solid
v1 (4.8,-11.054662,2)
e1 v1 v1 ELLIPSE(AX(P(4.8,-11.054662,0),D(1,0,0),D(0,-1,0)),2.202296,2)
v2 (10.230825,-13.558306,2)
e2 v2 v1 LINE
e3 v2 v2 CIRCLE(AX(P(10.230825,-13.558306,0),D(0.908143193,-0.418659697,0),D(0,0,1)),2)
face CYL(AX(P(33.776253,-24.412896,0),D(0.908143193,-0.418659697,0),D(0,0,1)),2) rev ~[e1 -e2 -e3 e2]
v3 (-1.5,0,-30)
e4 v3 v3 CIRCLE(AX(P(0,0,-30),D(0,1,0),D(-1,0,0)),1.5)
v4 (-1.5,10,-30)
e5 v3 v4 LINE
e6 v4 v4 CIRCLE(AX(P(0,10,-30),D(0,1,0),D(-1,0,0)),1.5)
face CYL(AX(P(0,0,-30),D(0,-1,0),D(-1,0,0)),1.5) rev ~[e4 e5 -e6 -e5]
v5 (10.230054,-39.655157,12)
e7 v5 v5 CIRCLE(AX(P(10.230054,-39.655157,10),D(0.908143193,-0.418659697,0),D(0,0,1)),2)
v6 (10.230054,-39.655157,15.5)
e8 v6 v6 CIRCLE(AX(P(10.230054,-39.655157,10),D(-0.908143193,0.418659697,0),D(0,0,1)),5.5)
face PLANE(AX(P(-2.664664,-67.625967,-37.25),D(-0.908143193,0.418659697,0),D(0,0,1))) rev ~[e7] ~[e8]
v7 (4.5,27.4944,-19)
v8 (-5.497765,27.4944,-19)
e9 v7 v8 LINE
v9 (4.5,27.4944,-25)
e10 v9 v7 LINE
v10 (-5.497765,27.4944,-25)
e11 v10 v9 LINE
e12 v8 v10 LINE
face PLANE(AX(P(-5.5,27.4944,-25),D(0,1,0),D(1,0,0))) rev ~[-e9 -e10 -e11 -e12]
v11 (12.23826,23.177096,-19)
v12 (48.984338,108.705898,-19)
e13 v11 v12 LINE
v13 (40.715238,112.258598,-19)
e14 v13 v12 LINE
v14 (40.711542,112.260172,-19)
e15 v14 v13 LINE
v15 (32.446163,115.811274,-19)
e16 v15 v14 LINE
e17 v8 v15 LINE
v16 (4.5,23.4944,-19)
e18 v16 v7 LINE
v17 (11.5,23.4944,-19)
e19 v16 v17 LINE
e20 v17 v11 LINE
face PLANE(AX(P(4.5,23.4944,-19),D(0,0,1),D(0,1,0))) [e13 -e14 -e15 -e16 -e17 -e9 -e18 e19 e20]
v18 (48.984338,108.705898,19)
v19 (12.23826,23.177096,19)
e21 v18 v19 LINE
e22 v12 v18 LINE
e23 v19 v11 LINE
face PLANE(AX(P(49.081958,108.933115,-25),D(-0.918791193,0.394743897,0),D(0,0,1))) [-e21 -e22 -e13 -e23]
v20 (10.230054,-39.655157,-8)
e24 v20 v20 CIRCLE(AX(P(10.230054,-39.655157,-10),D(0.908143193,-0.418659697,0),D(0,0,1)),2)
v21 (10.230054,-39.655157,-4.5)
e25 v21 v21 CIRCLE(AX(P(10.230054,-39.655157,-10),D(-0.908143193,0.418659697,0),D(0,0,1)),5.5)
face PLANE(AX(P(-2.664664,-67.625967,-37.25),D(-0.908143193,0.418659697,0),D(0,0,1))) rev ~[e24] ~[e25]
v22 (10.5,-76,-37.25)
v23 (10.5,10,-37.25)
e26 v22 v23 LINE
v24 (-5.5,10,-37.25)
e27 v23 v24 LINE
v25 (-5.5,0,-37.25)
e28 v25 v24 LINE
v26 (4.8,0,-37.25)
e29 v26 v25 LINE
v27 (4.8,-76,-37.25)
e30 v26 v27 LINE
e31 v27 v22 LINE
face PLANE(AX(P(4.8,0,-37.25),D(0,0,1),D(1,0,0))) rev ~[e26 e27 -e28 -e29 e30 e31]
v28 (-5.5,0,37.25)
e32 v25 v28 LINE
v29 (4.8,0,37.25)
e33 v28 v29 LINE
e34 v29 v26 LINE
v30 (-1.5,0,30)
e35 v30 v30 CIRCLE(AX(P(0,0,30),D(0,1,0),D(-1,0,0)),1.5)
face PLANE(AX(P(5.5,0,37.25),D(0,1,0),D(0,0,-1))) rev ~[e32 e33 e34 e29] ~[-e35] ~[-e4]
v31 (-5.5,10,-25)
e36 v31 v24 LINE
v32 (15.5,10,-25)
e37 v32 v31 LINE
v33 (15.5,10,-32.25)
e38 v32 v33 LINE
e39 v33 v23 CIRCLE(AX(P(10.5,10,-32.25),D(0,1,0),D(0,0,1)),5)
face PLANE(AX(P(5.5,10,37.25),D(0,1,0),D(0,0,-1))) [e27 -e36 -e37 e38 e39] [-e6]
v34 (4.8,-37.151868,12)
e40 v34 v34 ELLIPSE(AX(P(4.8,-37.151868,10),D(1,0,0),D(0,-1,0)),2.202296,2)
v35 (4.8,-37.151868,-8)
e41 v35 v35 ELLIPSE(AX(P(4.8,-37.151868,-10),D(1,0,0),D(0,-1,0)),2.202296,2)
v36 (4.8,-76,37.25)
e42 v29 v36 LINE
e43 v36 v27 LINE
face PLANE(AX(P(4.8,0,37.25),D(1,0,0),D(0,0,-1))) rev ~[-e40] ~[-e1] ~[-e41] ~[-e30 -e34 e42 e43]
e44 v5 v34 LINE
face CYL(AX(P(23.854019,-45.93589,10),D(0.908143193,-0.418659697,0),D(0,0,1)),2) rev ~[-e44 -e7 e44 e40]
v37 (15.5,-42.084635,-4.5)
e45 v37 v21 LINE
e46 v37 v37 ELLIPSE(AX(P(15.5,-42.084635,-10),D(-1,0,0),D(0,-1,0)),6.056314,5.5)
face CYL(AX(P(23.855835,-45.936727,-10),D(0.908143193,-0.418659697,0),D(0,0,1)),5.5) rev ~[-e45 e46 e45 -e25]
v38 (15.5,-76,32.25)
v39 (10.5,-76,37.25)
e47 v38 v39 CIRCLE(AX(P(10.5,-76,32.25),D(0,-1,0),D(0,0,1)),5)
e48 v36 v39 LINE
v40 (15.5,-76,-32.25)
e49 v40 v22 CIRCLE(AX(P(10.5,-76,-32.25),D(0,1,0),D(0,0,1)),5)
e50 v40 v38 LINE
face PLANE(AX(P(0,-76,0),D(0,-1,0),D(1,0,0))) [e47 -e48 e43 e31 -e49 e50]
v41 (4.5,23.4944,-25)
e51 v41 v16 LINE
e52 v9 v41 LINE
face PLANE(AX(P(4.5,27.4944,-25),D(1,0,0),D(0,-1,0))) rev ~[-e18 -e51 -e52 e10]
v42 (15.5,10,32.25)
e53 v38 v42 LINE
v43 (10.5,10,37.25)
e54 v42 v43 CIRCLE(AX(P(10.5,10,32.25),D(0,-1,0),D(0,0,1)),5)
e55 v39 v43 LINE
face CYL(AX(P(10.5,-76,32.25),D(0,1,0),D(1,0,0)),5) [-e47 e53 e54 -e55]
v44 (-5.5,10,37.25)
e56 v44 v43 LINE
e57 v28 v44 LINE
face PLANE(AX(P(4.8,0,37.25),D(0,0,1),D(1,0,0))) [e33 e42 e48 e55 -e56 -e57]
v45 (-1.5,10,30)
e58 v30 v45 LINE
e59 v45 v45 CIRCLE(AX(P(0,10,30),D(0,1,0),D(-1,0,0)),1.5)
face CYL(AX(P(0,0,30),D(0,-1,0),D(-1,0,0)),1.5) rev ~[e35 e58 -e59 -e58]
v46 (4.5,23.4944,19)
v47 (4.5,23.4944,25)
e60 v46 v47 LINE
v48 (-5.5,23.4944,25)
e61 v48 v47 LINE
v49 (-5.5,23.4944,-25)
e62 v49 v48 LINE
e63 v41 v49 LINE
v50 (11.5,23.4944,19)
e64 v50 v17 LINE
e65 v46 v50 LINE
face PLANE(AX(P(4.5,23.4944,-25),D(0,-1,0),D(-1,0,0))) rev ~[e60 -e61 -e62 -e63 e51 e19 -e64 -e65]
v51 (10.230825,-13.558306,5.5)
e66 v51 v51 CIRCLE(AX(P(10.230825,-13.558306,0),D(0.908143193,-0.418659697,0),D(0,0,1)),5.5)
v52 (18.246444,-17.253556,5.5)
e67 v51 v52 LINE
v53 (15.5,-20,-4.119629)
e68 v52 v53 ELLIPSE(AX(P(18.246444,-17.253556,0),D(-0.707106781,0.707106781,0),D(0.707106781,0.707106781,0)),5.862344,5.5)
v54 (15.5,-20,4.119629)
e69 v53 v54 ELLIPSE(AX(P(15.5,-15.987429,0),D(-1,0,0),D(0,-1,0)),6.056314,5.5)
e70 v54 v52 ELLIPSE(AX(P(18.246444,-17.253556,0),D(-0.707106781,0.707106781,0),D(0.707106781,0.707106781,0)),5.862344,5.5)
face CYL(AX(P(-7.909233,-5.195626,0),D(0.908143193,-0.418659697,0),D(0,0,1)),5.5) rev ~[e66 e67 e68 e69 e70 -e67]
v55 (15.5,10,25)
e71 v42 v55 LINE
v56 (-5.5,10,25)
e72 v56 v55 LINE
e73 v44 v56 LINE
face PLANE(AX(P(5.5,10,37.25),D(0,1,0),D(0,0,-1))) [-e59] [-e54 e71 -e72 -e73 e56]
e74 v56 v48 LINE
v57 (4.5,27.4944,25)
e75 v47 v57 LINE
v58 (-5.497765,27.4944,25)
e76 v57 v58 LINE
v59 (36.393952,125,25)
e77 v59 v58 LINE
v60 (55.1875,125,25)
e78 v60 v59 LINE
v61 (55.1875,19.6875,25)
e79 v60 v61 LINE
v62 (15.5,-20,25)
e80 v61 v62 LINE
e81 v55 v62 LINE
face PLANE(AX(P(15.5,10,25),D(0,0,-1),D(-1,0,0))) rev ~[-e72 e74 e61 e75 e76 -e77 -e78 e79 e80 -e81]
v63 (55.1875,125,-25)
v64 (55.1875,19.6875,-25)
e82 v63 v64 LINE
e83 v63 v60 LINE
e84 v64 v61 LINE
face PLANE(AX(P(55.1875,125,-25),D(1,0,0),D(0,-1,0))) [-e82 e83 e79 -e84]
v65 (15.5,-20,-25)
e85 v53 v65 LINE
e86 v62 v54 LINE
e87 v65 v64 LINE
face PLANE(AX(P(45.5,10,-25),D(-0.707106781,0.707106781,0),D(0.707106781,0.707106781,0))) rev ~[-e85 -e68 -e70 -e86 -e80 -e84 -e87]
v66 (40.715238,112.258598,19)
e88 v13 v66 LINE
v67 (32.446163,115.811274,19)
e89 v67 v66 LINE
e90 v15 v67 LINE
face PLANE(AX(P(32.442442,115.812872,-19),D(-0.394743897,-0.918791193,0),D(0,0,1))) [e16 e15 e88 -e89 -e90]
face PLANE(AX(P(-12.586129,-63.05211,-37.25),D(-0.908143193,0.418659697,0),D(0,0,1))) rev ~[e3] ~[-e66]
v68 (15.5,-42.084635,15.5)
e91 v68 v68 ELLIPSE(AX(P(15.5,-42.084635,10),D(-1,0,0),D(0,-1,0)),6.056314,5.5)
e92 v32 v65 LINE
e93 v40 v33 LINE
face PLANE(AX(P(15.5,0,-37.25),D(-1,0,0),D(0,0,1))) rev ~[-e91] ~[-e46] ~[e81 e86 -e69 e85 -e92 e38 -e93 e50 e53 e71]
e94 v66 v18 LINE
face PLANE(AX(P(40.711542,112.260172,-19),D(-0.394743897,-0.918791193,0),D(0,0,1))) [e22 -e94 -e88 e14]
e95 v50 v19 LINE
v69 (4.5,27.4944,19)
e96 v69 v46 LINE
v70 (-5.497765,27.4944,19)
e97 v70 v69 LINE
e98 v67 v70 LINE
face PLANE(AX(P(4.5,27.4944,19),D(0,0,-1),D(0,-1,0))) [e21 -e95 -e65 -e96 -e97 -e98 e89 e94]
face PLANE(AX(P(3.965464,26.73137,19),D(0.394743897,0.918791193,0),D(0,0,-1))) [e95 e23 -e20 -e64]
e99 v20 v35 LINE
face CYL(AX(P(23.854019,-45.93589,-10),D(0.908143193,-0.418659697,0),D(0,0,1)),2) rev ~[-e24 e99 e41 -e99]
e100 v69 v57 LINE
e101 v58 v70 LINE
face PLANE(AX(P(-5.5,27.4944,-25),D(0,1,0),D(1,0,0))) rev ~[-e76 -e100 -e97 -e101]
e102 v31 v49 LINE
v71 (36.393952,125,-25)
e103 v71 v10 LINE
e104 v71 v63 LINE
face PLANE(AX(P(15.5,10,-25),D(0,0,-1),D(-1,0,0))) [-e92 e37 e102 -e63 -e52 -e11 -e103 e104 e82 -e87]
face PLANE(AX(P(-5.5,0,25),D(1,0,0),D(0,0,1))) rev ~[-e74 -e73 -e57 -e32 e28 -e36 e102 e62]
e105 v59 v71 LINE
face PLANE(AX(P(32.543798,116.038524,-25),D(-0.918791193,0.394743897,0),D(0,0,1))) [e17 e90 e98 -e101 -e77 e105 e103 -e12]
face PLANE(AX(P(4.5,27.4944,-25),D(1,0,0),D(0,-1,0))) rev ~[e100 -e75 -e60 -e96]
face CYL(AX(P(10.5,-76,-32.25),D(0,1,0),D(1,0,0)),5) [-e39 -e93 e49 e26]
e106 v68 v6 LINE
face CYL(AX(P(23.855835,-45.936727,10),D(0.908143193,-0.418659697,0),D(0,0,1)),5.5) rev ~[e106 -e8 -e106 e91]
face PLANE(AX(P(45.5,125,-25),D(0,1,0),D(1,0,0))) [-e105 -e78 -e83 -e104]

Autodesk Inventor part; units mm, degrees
sketch "Sketch1" plane through (0, 0, 0) normal (0, 1, 0) x (-1, 0, 0)
  line L0 (5.5, 37.25) -> (-5.5, 37.25)
  line L1 (-5.5, 37.25) -> (-5.5, -37.25)
  line L2 (-5.5, -37.25) -> (5.5, -37.25)
  line L3 (5.5, -37.25) -> (5.5, 37.25)
  line L4 (5.5, 37.25) -> (-5.5, -37.25) construction
  line L5 (-5.5, 37.25) -> (5.5, -37.25) construction
  circle A0 centre (0, 30) radius 1.5
  line L6 (5.5, 0) -> (-5.5, 0)
  circle A1 centre (0, -30) radius 1.5
  line L7 (-5.5, -25) -> (5.5, -25)
  line L8 (5.5, -25) -> (5.5, 25)
  line L9 (5.5, 25) -> (-5.5, 25)
  line L10 (-5.5, 25) -> (-5.5, -25)
  line L11 (-5.5, -25) -> (5.5, 25) construction
  line L12 (5.5, -25) -> (-5.5, 25) construction
  point P0 (0, 0)
  dimension "d0" = 11
  dimension "d1" = 74.5
  dimension "d2" = 3
  dimension "d3" = 7.25
  dimension "d28" = 50
extrude "Extrusion1" add sketch "Sketch1" along normal blind 10
sketch "Sketch2" plane through (5.5, 0, 37.25) normal (1, 0, 0) x (0, 0, -1)
  line L0 (0, 10) -> (74.5, 10) projected
  line L1 (0, 0) -> (74.5, 0) projected
  line L2 (0, 10) -> (74.5, 10)
  line L3 (74.5, 10) -> (74.5, 0)
  line L4 (74.5, 0) -> (0, 0)
  line L5 (0, 0) -> (0, 10)
  point P0 (37.25, 0)
extrude "Extrusion2" add sketch "Sketch2" along normal blind 10
sketch "Sketch3" plane through (0, 0, 0) normal (0, -1, 0) x (1, 0, 0)
  line L0 (-5.5, 37.25) -> (15.5, 37.25) projected
  line L1 (-5.5, -37.25) -> (15.5, -37.25) projected
  line L2 (15.5, 37.25) -> (4.8, 37.25)
  line L3 (4.8, 37.25) -> (4.8, -37.25)
  line L4 (4.8, -37.25) -> (15.5, -37.25)
  line L5 (15.5, -37.25) -> (15.5, 37.25)
  point P0 (0, 0)
  dimension "d9" = 10.7
extrude "Extrusion3" add sketch "Sketch3" along normal blind 76
ref_plane "Work Plane1" through (15.5, -76, -37.25) normal (-0.9081432, 0.4186597, 0) x (0, 0, 1)
ref_plane "Work Plane3" through (10.9593, -73.9067, -37.25) normal (-0.9081432, 0.4186597, 0) x (0, 0, 1)
sketch "Sketch4" plane through (10.9593, -73.9067, -37.25) normal (-0.9081432, 0.4186597, 0) x (0, 0, 1)
  circle A0 centre (37.25, 54.5) radius 2
  circle A1 centre (37.25, 54.5) radius 5.5
  circle A2 centre (27.25, 30.8) radius 2
  circle A3 centre (27.25, 30.8) radius 5.5
  line L0 (37.25, 62.5297) -> (37.25, 0)
  line L1 (0, 0) -> (74.5, 0) projected
  circle A4 centre (47.25, 30.8) radius 5.5
  circle A5 centre (47.25, 30.8) radius 2
  point P0 (37.25, 0)
  dimension "d13" = 4
  dimension "d14" = 11
  dimension "d15" = 4
  dimension "d16" = 11
  dimension "d19" = 10
  dimension "d20" = 23.7
  dimension "d23" = 54.5
extrude "Extrusion4" cut sketch "Sketch4" along normal blind 15 contours A0 L0 | A0 L0 A1 | L0 A0 | A0 L0 A1 | A2 | A3 | A4 | A5
extrude "Extrusion11" cut sketch "Sketch4" along normal blind 25.925 contours A0 L0 | A0 L0 A1 | L0 A0 | A0 L0 A1
extrude "Extrusion6" cut sketch "Sketch4" along normal through all contours A0 L0 | L0 A0 | A2 | A5
extrude "Extrusion7" add sketch "Sketch1" along normal blind 125 contours L3 L6 L1 L9 | L3 L7 L1 L6
sketch "Sketch5" plane through (5.5, 10, -25) normal (1, 0, 0) x (0, 0, -1)
  line L0 (0, 0) -> (0, 115) projected
  line L1 (0, 115) -> (0, 0)
  line L2 (0, 0) -> (-50, 0)
  line L3 (-50, 0) -> (-50, 115)
  line L4 (0, 115) -> (-50, 115)
  point P0 (-25, -10)
extrude "Extrusion8" add sketch "Sketch5" along normal blind 40
chamfer "Chamfer1" distance 40 angle 23.25 1 edges at (-5.5, 125, 0) measured on face at (-5.5, 48.3333, -8.3333)
chamfer "Chamfer2" distance 30 distance2 30 1 edges at (15.5, 10, 0)
sketch "Sketch8" plane through (11.6854, 125, -25) normal (-0.9187912, 0.3947439, 0) x (0, 0, 1)
  line L0 (0, 0) -> (0, 13.3481) projected
  line L1 (-12.25, -121.6327) -> (62.25, -121.6327) projected
  line L2 (0, 13.3481) -> (50, 13.3481)
  line L3 (50, 13.3481) -> (50, -121.6327)
  line L4 (50, -121.6327) -> (0, -121.6327)
  line L5 (0, -121.6327) -> (0, 13.3481)
  point P0 (25, -119.4616)
  point P1 (0, 0)
  dimension "d59" = 50
extrude "Extrusion12" cut sketch "Sketch8" against normal blind 22.7
ref_plane "Work Plane4" through (64.6996, 102.2233, -25) normal (-0.9187912, 0.3947439, 0) x (0, 0, 1)
ref_plane "Work Plane5" through (32.5419, 116.0393, -25) normal (-0.9187912, 0.3947439, 0) x (0, 0, 1)
ref_plane "Work Plane6" through (-5.5, 27.4944, -18.625) normal (0.3947439, 0.9187912, 0) x (0, 0, -1)
sketch "Sketch11" plane through (15.5, 10, -25) normal (0, 0, -1) x (-1, 0, 0)
  line L0 (21, 17.4944) -> (-6.8294, 82.2691) projected
  line L1 (21, 17.4944) -> (11, 17.4944)
  line L2 (11, 17.4944) -> (11, 13.4944)
  line L3 (11, 13.4944) -> (21, 13.4944)
  line L4 (21, 13.4944) -> (21, 17.4944)
  point P0 (15.5, -10)
  dimension "d76" = 10
  dimension "d77" = 4
extrude "Extrusion15" cut sketch "Sketch11" against normal blind 70.5
fillet "Fillet1" radius 5 2 edges at (15.5, -33, 37.25) (15.5, -33, -37.25)
sketch "Sketch12" plane through (32.5419, 116.0393, -25) normal (-0.9187912, 0.3947439, 0) x (0, 0, 1)
  line L0 (6, -0.2473) -> (44, -0.2473)
  line L1 (44, -0.2473) -> (44, -96.0989)
  line L2 (6, -96.0989) -> (6, -0.2473)
  line L3 (0, -96.3711) -> (0, 9.7527) projected
  line L4 (50, 9.7527) -> (50, -96.3711) projected
  line L5 (0, 9.7527) -> (50, 9.7527) projected
  line L6 (44, -96.0989) -> (44, -96.8375)
  line L7 (44, -96.8375) -> (6, -96.8375)
  line L8 (6, -96.8375) -> (6, -96.0989)
  point P0 (25, -119.4616)
  dimension "d81" = 6
  dimension "d82" = 6
  dimension "d83" = 10
extrude "Extrusion16" cut sketch "Sketch12" against normal blind 9
sketch "Sketch14" plane through (4.5, 23.4944, -25) normal (-1, 0, 0) x (0, 0, 1)
  line L0 (6, 4) -> (6, 92.3177) projected
  line L1 (6, 4) -> (44, 4)
  line L2 (44, 4) -> (44, 0)
  line L3 (44, 0) -> (6, 0)
  line L4 (6, 0) -> (6, 4)
  point P0 (25, -23.4944)
  point P1 (6, 19)
extrude "Extrusion18" cut sketch "Sketch14" against normal blind 7
sketch "Sketch15" plane through (15.5, 10, -25) normal (0, 0, -1) x (-1, 0, 0)
  line L0 (-30, 115) -> (-39.6875, 115)
  line L1 (-39.6875, 115) -> (-39.6875, 9.6875)
  line L2 (-30, 0) -> (-39.6875, 9.6875)
  line L3 (0, -30) -> (-30, 0) projected
  line L4 (21, 13.4944) -> (11, 13.4944) projected
  line L5 (11, 13.4944) -> (11, 17.4944) projected
  line L6 (11, 17.4944) -> (21, 17.4944) projected
  line L7 (21, 17.4944) -> (-20.8917, 115) construction
  line L8 (-20.8917, 115) -> (-30, 115) projected
  line L9 (-30, 0) -> (-30, 115) projected
  line L10 (0, -30) -> (-30, 0) projected
  line L11 (0, 0) -> (0, -30) projected
  line L12 (21, 0) -> (0, 0) projected
  line L13 (21, 0) -> (21, 13.4944) projected
  point P0 (15.5, -10)
  dimension "d91" = 135
extrude "Extrusion19" add sketch "Sketch15" against normal blind 50
sketch "Sketch16" plane through (40.811, 112.4866, -25) normal (-0.9187912, 0.3947439, 0) x (0, 0, 1)
  line L0 (6, -96.3711) -> (6, -0.2473) projected
  line L1 (44, -93.3357) -> (6, -93.3357) projected
  line L2 (6, -0.2473) -> (44, -0.2473)
  line L3 (44, -0.2473) -> (44, -93.3357)
  line L4 (44, -93.3357) -> (6, -93.3357)
  line L5 (6, -93.3357) -> (6, -0.2473)
  point P0 (25, -119.4616)
extrude "Extrusion20" cut sketch "Sketch16" against normal blind 9
properties part number "Camera Bracket"
